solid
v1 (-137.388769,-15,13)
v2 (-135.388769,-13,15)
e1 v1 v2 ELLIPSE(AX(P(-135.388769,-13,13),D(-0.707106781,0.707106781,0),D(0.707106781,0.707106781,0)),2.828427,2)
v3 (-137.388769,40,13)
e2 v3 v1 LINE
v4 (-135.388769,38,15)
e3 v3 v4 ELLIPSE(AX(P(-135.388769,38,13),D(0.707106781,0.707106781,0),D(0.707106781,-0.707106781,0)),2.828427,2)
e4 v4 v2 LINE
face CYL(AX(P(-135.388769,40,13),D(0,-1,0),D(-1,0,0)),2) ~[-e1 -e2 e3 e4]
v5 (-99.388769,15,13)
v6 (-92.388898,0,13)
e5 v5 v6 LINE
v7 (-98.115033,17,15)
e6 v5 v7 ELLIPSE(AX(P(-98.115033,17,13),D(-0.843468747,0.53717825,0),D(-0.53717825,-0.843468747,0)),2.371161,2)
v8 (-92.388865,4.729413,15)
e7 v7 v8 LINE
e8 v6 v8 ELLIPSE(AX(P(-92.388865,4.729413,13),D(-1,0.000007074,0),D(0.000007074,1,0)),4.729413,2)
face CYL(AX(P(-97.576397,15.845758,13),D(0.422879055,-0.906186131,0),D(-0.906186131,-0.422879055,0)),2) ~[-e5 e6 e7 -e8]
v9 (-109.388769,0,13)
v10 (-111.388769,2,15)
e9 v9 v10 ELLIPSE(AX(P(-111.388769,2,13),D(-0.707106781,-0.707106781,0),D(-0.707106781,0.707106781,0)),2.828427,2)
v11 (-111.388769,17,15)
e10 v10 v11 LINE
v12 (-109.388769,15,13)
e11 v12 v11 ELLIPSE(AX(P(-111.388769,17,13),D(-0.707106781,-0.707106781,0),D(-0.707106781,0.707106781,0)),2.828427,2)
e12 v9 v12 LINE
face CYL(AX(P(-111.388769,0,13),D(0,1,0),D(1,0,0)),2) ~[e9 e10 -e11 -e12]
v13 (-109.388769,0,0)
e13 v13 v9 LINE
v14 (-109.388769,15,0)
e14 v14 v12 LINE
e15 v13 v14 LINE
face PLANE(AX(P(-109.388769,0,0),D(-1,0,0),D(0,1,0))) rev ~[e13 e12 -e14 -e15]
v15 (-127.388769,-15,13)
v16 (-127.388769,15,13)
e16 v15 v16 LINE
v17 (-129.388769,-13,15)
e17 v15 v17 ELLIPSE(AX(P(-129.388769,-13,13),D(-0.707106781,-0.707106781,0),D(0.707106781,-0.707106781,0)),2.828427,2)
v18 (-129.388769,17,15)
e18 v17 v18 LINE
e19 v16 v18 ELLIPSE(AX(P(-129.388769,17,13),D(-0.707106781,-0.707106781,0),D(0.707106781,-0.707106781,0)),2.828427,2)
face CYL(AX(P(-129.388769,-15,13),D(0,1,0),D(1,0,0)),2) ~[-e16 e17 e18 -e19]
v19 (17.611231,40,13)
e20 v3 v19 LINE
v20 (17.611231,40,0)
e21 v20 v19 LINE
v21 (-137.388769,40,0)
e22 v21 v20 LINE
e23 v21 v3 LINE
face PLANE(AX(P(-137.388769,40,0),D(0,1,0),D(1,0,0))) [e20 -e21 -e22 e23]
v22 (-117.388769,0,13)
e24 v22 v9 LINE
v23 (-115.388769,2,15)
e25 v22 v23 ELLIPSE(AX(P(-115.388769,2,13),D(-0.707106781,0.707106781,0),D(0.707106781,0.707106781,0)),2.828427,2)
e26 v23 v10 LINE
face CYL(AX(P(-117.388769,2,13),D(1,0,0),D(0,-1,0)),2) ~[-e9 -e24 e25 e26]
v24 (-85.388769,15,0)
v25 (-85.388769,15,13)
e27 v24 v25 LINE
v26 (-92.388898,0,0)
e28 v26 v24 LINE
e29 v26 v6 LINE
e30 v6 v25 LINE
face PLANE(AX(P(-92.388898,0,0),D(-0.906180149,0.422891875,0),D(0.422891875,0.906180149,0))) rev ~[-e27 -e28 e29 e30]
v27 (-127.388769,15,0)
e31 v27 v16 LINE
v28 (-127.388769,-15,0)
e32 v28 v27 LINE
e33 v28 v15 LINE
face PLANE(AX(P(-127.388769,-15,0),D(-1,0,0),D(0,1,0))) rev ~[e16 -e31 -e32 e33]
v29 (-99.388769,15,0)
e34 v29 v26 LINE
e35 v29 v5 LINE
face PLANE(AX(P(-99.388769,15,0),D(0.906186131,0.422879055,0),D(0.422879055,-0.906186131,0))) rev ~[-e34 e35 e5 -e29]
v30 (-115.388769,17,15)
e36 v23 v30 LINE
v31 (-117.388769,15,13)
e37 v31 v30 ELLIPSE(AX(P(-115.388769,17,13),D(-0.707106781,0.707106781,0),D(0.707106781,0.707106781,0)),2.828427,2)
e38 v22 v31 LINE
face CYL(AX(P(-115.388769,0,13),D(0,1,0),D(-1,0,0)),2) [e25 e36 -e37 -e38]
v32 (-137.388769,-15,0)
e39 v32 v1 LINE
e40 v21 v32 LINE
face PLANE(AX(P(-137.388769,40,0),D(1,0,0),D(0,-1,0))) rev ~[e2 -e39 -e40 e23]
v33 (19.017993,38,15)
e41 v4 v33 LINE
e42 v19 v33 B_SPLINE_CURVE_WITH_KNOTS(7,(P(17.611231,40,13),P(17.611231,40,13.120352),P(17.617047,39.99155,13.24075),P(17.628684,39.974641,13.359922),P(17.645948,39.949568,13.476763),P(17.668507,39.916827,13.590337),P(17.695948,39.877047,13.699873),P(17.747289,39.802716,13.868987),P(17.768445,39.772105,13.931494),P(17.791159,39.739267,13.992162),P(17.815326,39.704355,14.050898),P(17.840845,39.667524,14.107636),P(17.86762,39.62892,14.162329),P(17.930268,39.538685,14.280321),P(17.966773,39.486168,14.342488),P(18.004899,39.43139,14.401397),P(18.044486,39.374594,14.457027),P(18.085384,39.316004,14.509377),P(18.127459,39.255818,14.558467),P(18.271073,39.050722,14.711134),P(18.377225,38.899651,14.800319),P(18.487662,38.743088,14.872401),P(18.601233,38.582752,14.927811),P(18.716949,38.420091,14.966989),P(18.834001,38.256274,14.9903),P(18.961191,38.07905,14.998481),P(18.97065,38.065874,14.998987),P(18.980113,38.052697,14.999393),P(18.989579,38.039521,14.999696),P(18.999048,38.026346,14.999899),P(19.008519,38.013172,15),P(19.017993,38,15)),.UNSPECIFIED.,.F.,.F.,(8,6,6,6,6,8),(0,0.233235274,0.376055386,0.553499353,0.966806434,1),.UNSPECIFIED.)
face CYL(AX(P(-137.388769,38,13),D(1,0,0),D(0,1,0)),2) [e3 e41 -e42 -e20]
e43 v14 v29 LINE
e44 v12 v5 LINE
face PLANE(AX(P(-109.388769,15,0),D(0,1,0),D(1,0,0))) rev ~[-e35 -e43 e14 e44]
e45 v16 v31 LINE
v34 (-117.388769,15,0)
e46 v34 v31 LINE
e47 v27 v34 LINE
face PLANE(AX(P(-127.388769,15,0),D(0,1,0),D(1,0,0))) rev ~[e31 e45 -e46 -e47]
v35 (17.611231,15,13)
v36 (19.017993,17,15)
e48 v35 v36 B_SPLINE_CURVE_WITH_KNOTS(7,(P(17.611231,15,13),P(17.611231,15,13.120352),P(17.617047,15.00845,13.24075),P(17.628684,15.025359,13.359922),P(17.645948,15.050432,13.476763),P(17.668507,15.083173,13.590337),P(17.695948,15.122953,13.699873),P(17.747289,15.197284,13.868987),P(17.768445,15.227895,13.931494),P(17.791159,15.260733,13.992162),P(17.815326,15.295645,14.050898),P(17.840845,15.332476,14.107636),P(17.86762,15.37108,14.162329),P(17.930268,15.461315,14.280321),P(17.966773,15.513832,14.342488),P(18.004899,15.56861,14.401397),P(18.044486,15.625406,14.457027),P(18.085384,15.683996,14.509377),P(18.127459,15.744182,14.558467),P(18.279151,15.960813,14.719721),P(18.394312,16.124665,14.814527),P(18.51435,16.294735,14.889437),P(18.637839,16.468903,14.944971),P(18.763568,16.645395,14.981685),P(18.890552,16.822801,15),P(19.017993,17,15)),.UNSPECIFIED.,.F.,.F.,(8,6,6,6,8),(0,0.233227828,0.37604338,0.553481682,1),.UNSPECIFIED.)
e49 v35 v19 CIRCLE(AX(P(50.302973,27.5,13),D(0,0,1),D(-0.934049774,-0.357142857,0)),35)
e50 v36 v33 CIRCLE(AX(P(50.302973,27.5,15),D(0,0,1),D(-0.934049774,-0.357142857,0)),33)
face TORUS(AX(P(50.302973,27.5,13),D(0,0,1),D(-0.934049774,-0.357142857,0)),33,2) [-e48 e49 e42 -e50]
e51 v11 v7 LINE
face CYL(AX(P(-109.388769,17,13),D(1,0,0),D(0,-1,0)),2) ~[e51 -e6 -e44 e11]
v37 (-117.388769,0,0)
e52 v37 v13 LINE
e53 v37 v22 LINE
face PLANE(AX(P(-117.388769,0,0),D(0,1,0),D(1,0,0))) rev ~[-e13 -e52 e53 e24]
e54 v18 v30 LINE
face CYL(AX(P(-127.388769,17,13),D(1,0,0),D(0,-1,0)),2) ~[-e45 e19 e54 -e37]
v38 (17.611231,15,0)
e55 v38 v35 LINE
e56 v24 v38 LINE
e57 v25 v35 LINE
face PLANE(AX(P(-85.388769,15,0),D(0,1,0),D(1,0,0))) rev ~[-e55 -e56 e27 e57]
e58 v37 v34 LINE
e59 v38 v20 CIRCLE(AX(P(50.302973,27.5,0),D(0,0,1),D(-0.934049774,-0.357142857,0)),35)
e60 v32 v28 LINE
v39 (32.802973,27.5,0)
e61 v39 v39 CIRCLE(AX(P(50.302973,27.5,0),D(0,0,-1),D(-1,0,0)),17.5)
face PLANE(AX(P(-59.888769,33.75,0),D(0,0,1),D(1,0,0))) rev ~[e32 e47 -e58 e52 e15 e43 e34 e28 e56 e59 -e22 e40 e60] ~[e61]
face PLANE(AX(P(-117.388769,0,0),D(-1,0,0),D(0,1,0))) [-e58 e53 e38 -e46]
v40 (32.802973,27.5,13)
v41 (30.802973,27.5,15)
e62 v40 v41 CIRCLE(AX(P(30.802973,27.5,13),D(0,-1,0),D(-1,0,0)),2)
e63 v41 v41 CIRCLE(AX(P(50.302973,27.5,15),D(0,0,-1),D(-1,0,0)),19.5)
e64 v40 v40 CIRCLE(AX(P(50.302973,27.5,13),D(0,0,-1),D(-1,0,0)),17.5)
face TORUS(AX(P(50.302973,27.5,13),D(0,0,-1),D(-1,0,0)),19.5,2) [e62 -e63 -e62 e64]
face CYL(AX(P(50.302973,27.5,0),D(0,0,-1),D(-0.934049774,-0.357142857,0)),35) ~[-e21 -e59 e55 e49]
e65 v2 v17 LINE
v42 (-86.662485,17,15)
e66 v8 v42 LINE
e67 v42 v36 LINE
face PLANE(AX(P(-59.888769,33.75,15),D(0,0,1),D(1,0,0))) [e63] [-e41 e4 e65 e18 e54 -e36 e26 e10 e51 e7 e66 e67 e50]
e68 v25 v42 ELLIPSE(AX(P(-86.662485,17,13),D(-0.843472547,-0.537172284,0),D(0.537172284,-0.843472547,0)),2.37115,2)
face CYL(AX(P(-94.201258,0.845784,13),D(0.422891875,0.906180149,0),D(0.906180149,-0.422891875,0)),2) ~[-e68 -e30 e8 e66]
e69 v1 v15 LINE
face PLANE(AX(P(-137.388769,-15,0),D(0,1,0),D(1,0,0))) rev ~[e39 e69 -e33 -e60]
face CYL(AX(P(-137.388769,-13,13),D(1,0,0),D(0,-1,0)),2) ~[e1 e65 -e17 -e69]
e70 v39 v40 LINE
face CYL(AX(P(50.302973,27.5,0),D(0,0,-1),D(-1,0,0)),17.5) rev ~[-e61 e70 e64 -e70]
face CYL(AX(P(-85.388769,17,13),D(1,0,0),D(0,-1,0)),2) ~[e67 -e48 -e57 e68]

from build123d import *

# Parameters (mm, degrees)
F0_W     = 155
F0_H     = 12.5
F0_W_2   = 8
F0_H_2   = 15
F0_W_3   = 10
F0_H_3   = 30
F1_DEPTH = 15
F2_R     = 2


with BuildPart() as f1:
    # F0 (on Top) → F1 (new body)
    with BuildSketch(Plane.XY):
        with Locations((-59.8887689211, 33.75)):
            Rectangle(F0_W, F0_H)
        Polygon((17.6112310789, 27.5), (-137.3887689211, 27.5), (-137.3887689211, 15), (-127.3887689211, 15), (-117.3887689211, 15), (-109.3887689211, 15), (-99.3887689211, 15), (-85.3887689211, 15), (17.6112310789, 15), align=None)
        with BuildLine():
            ThreePointArc((17.6112310789, 15), (85.3029731554, 27.5), (17.6112310789, 40))
            Line((17.6112310789, 40), (17.6112310789, 27.5))
            Line((17.6112310789, 27.5), (17.6112310789, 15))
        make_face()
        with BuildLine():
            ThreePointArc((67.8029731554, 27.5), (50.3029731554, 10), (32.8029731554, 27.5))
            ThreePointArc((32.8029731554, 27.5), (50.3029731554, 45), (67.8029731554, 27.5))
        make_face(mode=Mode.SUBTRACT)
        Polygon((-92.3888981342, 0), (-85.3887689211, 15), (-99.3887689211, 15), align=None)
        with Locations((-113.3887689211, 7.5)):
            Rectangle(F0_W_2, F0_H_2)
        with Locations((-132.3887689211, 0)):
            Rectangle(F0_W_3, F0_H_3)
    extrude(amount=F1_DEPTH)

    # F2
    f2_edges = [f1.edges().sort_by_distance(p)[0] for p in [
        (-59.888769, 40, 15),
        (85.302973, 27.5, 15),
        (-33.888769, 15, 15),
        (-88.888834, 7.5, 15),
        (-122.388769, 15, 15),
        (-109.388769, 7.5, 15),
        (-132.388769, -15, 15),
        (-127.388769, 0, 15),
        (-137.388769, 12.5, 15),
        (-113.388769, 0, 15),
        (-117.388769, 7.5, 15),
        (-95.888834, 7.5, 15),
        (67.802973, 27.5, 15),
        (-104.388769, 15, 15),
    ]]
    fillet(f2_edges, radius=F2_R)


solid = f1.part
